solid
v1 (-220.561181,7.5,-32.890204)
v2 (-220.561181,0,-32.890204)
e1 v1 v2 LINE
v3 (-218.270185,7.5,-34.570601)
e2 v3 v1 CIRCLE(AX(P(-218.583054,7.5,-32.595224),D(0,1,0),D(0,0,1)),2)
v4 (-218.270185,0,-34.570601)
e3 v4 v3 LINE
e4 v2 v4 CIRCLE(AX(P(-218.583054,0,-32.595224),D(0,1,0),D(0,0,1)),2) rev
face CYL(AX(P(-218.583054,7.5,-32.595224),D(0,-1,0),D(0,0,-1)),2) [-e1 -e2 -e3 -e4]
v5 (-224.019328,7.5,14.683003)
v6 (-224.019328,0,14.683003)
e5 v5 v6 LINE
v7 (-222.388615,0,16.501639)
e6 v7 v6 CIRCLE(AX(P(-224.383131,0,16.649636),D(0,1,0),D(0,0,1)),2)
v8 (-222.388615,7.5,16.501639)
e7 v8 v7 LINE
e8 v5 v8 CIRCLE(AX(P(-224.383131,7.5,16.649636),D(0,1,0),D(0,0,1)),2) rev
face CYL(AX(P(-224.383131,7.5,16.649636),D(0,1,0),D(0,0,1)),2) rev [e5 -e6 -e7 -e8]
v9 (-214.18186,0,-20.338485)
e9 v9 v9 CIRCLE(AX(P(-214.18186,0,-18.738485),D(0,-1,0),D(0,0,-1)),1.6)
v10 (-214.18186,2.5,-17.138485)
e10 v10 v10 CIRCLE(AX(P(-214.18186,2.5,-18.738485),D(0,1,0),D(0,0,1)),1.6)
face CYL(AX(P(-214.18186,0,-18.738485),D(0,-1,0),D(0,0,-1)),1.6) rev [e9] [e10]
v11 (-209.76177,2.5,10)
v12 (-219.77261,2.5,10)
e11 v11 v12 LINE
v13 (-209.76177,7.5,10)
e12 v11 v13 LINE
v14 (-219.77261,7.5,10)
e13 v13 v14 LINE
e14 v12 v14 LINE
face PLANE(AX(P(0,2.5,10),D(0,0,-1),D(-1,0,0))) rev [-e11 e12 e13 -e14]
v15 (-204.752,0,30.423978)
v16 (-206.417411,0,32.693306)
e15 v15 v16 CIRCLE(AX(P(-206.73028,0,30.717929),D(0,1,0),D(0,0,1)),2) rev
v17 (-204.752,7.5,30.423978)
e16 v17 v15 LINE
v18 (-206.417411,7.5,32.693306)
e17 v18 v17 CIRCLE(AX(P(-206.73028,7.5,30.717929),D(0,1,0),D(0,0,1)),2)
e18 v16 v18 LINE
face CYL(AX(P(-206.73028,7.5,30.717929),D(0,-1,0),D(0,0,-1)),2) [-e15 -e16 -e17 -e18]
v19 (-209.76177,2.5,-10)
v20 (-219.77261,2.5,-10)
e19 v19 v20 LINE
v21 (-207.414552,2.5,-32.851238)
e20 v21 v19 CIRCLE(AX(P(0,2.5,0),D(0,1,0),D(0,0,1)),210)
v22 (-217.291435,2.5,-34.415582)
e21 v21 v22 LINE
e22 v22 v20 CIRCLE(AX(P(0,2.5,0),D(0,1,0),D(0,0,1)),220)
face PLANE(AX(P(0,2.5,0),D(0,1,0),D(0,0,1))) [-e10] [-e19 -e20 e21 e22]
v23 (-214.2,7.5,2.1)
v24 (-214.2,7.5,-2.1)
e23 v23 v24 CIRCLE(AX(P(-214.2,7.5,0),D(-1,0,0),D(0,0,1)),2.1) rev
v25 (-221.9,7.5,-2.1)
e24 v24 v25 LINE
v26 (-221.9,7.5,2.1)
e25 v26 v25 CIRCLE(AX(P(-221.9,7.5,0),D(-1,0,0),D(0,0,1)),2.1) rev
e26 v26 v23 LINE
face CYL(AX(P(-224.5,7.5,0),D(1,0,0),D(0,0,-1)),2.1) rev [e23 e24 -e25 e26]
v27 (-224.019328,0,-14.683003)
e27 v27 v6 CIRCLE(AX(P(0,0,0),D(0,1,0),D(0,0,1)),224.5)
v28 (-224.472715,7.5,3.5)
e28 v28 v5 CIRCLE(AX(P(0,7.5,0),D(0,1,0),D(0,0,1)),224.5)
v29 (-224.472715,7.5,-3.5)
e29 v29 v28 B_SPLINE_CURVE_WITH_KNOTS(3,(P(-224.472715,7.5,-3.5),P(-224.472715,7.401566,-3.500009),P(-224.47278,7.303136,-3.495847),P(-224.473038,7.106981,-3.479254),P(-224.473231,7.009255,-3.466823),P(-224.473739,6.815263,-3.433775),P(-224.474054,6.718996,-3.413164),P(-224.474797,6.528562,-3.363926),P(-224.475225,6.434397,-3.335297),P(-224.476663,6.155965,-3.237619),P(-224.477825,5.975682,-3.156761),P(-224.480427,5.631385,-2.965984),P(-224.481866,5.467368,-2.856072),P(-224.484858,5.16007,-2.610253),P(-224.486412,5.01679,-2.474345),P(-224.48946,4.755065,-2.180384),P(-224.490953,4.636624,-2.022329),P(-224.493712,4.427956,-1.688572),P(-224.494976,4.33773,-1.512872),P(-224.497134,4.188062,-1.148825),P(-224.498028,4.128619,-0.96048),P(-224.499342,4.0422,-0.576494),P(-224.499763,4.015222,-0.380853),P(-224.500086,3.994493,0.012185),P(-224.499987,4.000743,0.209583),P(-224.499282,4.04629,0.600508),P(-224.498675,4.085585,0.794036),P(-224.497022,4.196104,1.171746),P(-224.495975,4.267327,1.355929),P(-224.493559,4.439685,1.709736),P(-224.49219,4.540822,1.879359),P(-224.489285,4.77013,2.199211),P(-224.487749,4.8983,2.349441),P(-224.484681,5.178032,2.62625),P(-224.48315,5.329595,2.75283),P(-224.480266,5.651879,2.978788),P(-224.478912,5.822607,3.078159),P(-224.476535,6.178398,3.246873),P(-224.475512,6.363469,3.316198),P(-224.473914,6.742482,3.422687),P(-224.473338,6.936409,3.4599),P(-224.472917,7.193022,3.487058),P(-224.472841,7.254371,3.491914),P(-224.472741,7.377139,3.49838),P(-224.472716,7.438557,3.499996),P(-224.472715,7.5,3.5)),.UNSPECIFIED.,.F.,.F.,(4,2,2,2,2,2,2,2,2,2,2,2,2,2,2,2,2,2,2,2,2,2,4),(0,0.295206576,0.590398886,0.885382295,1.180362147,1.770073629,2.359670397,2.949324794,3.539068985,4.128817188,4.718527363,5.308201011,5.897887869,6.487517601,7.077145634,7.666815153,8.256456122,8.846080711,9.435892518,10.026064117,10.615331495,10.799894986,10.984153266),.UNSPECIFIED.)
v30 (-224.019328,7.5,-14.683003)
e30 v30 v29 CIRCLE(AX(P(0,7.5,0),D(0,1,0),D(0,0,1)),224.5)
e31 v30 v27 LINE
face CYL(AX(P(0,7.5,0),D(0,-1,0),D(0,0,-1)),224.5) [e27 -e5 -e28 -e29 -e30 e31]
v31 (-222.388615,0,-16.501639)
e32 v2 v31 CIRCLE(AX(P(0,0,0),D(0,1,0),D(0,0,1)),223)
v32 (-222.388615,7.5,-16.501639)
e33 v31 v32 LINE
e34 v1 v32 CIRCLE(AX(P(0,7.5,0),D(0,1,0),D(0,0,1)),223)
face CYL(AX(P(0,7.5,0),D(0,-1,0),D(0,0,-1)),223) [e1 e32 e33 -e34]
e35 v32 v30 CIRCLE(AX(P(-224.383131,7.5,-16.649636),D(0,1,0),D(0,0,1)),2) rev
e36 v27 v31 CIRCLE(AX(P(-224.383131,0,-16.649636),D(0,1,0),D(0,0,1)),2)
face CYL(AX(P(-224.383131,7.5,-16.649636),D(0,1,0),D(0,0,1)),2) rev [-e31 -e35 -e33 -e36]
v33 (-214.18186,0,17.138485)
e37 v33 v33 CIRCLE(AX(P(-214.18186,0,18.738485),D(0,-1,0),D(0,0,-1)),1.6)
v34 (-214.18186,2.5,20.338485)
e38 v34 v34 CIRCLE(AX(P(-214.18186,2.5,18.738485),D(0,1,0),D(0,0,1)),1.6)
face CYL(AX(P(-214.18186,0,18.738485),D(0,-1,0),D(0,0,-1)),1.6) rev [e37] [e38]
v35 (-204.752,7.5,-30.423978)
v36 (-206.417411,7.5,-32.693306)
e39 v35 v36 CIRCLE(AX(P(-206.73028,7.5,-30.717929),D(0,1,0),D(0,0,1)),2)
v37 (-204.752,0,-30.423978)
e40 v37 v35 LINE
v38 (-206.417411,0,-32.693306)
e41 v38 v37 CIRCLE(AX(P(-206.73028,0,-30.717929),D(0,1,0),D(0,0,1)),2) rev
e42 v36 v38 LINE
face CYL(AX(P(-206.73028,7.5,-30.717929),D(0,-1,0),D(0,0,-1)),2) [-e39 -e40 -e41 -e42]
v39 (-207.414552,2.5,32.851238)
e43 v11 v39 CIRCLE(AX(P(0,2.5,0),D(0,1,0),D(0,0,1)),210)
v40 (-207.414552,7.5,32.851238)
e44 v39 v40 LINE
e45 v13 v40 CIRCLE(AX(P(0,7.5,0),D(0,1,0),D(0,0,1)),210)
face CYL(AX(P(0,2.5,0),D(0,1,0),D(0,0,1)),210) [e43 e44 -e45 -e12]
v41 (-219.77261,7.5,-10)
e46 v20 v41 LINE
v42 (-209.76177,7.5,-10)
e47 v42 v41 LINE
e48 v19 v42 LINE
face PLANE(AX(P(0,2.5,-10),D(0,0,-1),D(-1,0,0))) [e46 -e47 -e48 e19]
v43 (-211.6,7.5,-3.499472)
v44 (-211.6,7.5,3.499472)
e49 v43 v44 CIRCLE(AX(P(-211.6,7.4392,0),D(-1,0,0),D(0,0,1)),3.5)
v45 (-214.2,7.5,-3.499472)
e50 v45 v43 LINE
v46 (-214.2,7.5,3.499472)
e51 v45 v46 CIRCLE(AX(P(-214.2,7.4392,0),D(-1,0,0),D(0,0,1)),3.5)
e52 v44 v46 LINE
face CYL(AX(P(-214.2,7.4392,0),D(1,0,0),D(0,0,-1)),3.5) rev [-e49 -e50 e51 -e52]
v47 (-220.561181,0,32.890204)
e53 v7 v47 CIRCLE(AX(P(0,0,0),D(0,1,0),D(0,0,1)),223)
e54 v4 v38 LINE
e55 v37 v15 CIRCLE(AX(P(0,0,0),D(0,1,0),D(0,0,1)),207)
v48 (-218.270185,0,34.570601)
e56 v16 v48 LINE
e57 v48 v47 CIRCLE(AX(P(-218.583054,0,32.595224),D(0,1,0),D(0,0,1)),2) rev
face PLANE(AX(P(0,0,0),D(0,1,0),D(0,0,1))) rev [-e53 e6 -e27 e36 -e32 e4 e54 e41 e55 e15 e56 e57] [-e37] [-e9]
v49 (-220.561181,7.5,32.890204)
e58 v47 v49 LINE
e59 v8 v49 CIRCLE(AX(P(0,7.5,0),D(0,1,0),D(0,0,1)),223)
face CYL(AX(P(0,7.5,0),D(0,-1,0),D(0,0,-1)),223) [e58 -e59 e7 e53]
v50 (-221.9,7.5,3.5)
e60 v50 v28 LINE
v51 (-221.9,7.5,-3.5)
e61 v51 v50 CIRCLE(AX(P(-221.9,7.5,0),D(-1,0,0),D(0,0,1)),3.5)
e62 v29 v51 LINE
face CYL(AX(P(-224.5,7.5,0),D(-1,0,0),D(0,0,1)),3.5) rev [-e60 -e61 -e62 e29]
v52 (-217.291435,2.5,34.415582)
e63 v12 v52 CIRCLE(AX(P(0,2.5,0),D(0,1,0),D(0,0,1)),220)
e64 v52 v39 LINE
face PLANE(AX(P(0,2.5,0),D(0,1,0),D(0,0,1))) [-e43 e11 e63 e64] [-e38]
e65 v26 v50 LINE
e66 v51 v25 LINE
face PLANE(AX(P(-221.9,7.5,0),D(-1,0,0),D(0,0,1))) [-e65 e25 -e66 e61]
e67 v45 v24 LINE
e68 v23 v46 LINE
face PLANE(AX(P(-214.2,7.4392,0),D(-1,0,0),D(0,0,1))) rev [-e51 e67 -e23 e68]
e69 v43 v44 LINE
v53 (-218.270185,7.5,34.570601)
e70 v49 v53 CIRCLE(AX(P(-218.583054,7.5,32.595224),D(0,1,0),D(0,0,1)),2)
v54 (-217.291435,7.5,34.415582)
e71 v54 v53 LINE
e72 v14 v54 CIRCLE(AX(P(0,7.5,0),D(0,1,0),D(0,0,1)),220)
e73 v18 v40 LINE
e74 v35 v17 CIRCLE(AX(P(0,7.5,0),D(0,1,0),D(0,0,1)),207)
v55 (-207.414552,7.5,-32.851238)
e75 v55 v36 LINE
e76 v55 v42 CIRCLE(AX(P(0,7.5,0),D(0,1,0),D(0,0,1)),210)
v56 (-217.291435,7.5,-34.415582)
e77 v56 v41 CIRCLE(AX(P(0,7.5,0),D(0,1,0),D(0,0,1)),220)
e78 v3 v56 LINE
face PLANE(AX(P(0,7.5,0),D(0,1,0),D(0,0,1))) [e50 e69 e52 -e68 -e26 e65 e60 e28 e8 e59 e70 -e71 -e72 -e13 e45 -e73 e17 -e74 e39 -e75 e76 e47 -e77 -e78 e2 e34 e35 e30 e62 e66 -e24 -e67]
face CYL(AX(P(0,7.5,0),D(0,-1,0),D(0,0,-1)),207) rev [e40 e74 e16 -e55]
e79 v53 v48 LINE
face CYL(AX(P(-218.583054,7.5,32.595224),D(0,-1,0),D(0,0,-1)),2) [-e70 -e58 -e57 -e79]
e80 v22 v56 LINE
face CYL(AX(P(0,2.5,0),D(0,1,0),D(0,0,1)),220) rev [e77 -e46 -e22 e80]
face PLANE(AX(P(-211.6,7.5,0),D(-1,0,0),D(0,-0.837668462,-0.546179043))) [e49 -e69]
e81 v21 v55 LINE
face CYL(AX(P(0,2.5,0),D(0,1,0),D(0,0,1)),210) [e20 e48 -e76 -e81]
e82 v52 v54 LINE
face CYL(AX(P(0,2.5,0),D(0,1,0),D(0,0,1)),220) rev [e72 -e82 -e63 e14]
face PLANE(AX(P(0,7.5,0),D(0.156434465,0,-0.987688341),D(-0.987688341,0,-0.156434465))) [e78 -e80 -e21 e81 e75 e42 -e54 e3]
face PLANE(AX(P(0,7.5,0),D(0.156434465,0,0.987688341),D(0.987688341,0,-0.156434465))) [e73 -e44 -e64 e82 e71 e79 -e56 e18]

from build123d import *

# Parameters (mm, degrees)
BOSS_EXTRUDE1_DEPTH            = 7.5
BOSS_EXTRUDE2_DEPTH            = 7.5
CUT_EXTRUDE1_DEPTH             = 5
F_3_2_3_2_DIAMETER_HOLE1_D     = 3.2
FILLET1_R                      = 2
FILLET2_R                      = 2
CUT_EXTRUDE2_REACH             = 39.378
CUT_EXTRUDE2_END_RADIUS        = 224.5
SKETCH22_R                     = 2.1
CUT_EXTRUDE2_DIRECTION_2_DEPTH = 0.9
SKETCH23_R                     = 3.5
CUT_EXTRUDE3_DEPTH             = 2.6
SKETCH24_W                     = 2.6
SKETCH24_H                     = 3.5


with BuildPart() as part:
    # Sketch1 → Boss-Extrude1 (new body)
    with BuildSketch(Plane(origin=(0, 0, 0), x_dir=(1, 0, 0), z_dir=(0, 1, 0))):
        with BuildLine():
            ThreePointArc((-207.414551525, 32.851237658), (-210, 0), (-207.414551525, -32.851237658))
            Line((-207.414551525, -32.851237658), (-217.291434931, -34.415582309))
            ThreePointArc((-217.291434931, -34.415582309), (-220, 0), (-217.291434931, 34.415582309))
            Line((-217.291434931, 34.415582309), (-207.414551525, 32.851237658))
        make_face()
        with BuildLine():
            ThreePointArc((-217.291434931, -34.415582309), (-220, 0), (-217.291434931, 34.415582309))
            Line((-217.291434931, 34.415582309), (-220.254499953, 34.884885704))
            ThreePointArc((-220.254499953, 34.884885704), (-223, 0), (-220.254499953, -34.884885704))
            Line((-220.254499953, -34.884885704), (-217.291434931, -34.415582309))
        make_face()
        with BuildLine():
            Line((-204.451486503, 32.381934263), (-207.414551525, 32.851237658))
            ThreePointArc((-207.414551525, 32.851237658), (-210, 0), (-207.414551525, -32.851237658))
            Line((-207.414551525, -32.851237658), (-204.451486503, -32.381934263))
            ThreePointArc((-204.451486503, -32.381934263), (-207, 0), (-204.451486503, 32.381934263))
        make_face()
    extrude(amount=BOSS_EXTRUDE1_DEPTH)

    # Sketch19 → Boss-Extrude2 (add)
    with BuildSketch(Plane(origin=(0, 0, 0), x_dir=(1, 0, 0), z_dir=(0, 1, 0))):
        with BuildLine():
            Line((-224.019328267, 14.683002512), (-222.522539882, 14.584897818))
            ThreePointArc((-222.522539882, 14.584897818), (-223, 0), (-222.522539882, -14.584897818))
            Line((-222.522539882, -14.584897818), (-224.019328267, -14.683002512))
            ThreePointArc((-224.019328267, -14.683002512), (-224.5, 0), (-224.019328267, 14.683002512))
        make_face()
    extrude(amount=BOSS_EXTRUDE2_DEPTH)

    # Sketch15 → Cut-Extrude1 (cut)
    with BuildSketch(Plane(origin=(0, 7.5, 0), x_dir=(1, 0, 0), z_dir=(0, 1, 0))):
        with BuildLine():
            Line((-219.772609758, 10), (-209.761769634, 10))
            ThreePointArc((-209.761769634, 10), (-208.900850883, 21.457737542), (-207.414551525, 32.851237658))
            Line((-207.414551525, 32.851237658), (-217.291434931, 34.415582309))
            ThreePointArc((-217.291434931, 34.415582309), (-218.872736893, 22.242415451), (-219.772609758, 10))
        make_face()
        with BuildLine():
            ThreePointArc((-207.414551525, -32.851237658), (-208.900850883, -21.457737542), (-209.761769634, -10))
            Line((-209.761769634, -10), (-219.772609758, -10))
            ThreePointArc((-219.772609758, -10), (-218.872736893, -22.242415451), (-217.291434931, -34.415582309))
            Line((-217.291434931, -34.415582309), (-207.414551525, -32.851237658))
        make_face()
    extrude(amount=-CUT_EXTRUDE1_DEPTH, mode=Mode.SUBTRACT)

    # Ø3.2 (3.2) Diameter Hole1 (through all)
    with Locations(Plane(origin=(0, 0, 0), x_dir=(-1, 0, 0), z_dir=(0, -1, 0))):
        with Locations((214.18186009, -18.738484691), (214.18186009, 18.738484691)):
            Hole(F_3_2_3_2_DIAMETER_HOLE1_D / 2)

    # Fillet1
    fillet1_edges = [part.edges().sort_by_distance(p)[0] for p in [
        (-220.254499953, 3.75, 34.884885704),
        (-220.254499953, 3.75, -34.884885704),
        (-204.451486503, 3.75, -32.381934263),
        (-204.451486503, 3.75, 32.381934263),
    ]]
    fillet(fillet1_edges, radius=FILLET1_R)

    # Fillet2
    # the kernel refuses this fillet: 2 mm, written as the material it adds along each edge
    with BuildSketch(Plane(origin=(-222.522539882, 0, -14.584897818), x_dir=(0.06970140258603677, 0, -0.9975678996827931), z_dir=(0, 1, 0))) as fillet2_piece_1:
        with BuildLine():
            CenterArc((1.930030715, 1.99998144), FILLET2_R, 194.477374901, 75.275788142)
            Line((-0.006462156, 1.49998608), (-0.045192014, 1.489986173))
            ThreePointArc((-0.045192014, 1.489986173), (-0.043230707, 0.749820716), (-0.039999629, -0.000172324))
            Line((-0.039999629, -0.000172324), (0.000172324, -0.039999629))
            ThreePointArc((0.000172324, -0.039999629), (0.960707253, -0.037930577), (1.921242182, -0.039999629))
            Line((1.921242182, -0.039999629), (1.921414506, 0))
        make_face()
    extrude(amount=7.5)
    with BuildSketch(Plane(origin=(-222.522539882, 0, 14.584897818), x_dir=(-0.9978589232386029, 0, 0.06540312923015226), z_dir=(0, 1, 0))) as fillet2_piece_2:
        with BuildLine():
            CenterArc((1.991648107, 1.938628933), FILLET2_R, 180.493673912, 75.275788142)
            Line((-0.008277654, 1.921396676), (-0.048276169, 1.92105203))
            ThreePointArc((-0.048276169, 1.92105203), (-0.042069052, 0.960534929), (-0.04, 0))
            Line((-0.04, 0), (0, -0.04))
            ThreePointArc((0, -0.04), (0.75, -0.04), (1.490167038, -0.038772579))
            Line((1.490167038, -0.038772579), (1.5, 0))
        make_face()
    extrude(amount=7.5)

    # Cut-Extrude2: up to this cylinder (the profile starts inside it)
    cut_extrude2_end = Plane(origin=(0, 7.5, 0), z_dir=(0, -1, 0)) * Cylinder(CUT_EXTRUDE2_END_RADIUS, 528.756, mode=Mode.PRIVATE)
    # Sketch22 → Cut-Extrude2 (cut, up to the surface)
    with BuildSketch(Plane(origin=(-212.5, 0, 0), x_dir=(0, 0, -1), z_dir=(1, 0, 0)), mode=Mode.PRIVATE) as cut_extrude2_sk1:
        with Locations((0, 7.5)):
            Circle(SKETCH22_R)
    cut_extrude2_tool1 = extrude(cut_extrude2_sk1.sketch, amount=-CUT_EXTRUDE2_REACH, mode=Mode.PRIVATE) & cut_extrude2_end
    add(cut_extrude2_tool1.solids().sort_by_distance((-212.5, 7.5, 0))[0], mode=Mode.SUBTRACT)

    # Sketch22 → Cut-Extrude2 direction 2 (cut)
    with BuildSketch(Plane(origin=(-212.5, 0, 0), x_dir=(0, 0, -1), z_dir=(1, 0, 0))):
        with Locations((0, 7.5)):
            Circle(SKETCH22_R)
    extrude(amount=CUT_EXTRUDE2_DIRECTION_2_DEPTH, mode=Mode.SUBTRACT)

    # Sketch23 → Cut-Extrude3 (cut)
    with BuildSketch(Plane.ZY.offset(211.6)):
        with Locations((0, 7.439199918)):
            Circle(SKETCH23_R)
    extrude(amount=CUT_EXTRUDE3_DEPTH, mode=Mode.SUBTRACT)

    # Sketch24 → Cut-Revolve1 (revolve, cut)
    with BuildSketch(Plane(origin=(0, 7.5, 0), x_dir=(1, 0, 0), z_dir=(0, 1, 0))):
        with Locations((-223.2, 1.75)):
            Rectangle(SKETCH24_W, SKETCH24_H)
    revolve(axis=Axis((-224.5, 7.5, 0), (1, 0, 0)), mode=Mode.SUBTRACT)


solid = part.part
